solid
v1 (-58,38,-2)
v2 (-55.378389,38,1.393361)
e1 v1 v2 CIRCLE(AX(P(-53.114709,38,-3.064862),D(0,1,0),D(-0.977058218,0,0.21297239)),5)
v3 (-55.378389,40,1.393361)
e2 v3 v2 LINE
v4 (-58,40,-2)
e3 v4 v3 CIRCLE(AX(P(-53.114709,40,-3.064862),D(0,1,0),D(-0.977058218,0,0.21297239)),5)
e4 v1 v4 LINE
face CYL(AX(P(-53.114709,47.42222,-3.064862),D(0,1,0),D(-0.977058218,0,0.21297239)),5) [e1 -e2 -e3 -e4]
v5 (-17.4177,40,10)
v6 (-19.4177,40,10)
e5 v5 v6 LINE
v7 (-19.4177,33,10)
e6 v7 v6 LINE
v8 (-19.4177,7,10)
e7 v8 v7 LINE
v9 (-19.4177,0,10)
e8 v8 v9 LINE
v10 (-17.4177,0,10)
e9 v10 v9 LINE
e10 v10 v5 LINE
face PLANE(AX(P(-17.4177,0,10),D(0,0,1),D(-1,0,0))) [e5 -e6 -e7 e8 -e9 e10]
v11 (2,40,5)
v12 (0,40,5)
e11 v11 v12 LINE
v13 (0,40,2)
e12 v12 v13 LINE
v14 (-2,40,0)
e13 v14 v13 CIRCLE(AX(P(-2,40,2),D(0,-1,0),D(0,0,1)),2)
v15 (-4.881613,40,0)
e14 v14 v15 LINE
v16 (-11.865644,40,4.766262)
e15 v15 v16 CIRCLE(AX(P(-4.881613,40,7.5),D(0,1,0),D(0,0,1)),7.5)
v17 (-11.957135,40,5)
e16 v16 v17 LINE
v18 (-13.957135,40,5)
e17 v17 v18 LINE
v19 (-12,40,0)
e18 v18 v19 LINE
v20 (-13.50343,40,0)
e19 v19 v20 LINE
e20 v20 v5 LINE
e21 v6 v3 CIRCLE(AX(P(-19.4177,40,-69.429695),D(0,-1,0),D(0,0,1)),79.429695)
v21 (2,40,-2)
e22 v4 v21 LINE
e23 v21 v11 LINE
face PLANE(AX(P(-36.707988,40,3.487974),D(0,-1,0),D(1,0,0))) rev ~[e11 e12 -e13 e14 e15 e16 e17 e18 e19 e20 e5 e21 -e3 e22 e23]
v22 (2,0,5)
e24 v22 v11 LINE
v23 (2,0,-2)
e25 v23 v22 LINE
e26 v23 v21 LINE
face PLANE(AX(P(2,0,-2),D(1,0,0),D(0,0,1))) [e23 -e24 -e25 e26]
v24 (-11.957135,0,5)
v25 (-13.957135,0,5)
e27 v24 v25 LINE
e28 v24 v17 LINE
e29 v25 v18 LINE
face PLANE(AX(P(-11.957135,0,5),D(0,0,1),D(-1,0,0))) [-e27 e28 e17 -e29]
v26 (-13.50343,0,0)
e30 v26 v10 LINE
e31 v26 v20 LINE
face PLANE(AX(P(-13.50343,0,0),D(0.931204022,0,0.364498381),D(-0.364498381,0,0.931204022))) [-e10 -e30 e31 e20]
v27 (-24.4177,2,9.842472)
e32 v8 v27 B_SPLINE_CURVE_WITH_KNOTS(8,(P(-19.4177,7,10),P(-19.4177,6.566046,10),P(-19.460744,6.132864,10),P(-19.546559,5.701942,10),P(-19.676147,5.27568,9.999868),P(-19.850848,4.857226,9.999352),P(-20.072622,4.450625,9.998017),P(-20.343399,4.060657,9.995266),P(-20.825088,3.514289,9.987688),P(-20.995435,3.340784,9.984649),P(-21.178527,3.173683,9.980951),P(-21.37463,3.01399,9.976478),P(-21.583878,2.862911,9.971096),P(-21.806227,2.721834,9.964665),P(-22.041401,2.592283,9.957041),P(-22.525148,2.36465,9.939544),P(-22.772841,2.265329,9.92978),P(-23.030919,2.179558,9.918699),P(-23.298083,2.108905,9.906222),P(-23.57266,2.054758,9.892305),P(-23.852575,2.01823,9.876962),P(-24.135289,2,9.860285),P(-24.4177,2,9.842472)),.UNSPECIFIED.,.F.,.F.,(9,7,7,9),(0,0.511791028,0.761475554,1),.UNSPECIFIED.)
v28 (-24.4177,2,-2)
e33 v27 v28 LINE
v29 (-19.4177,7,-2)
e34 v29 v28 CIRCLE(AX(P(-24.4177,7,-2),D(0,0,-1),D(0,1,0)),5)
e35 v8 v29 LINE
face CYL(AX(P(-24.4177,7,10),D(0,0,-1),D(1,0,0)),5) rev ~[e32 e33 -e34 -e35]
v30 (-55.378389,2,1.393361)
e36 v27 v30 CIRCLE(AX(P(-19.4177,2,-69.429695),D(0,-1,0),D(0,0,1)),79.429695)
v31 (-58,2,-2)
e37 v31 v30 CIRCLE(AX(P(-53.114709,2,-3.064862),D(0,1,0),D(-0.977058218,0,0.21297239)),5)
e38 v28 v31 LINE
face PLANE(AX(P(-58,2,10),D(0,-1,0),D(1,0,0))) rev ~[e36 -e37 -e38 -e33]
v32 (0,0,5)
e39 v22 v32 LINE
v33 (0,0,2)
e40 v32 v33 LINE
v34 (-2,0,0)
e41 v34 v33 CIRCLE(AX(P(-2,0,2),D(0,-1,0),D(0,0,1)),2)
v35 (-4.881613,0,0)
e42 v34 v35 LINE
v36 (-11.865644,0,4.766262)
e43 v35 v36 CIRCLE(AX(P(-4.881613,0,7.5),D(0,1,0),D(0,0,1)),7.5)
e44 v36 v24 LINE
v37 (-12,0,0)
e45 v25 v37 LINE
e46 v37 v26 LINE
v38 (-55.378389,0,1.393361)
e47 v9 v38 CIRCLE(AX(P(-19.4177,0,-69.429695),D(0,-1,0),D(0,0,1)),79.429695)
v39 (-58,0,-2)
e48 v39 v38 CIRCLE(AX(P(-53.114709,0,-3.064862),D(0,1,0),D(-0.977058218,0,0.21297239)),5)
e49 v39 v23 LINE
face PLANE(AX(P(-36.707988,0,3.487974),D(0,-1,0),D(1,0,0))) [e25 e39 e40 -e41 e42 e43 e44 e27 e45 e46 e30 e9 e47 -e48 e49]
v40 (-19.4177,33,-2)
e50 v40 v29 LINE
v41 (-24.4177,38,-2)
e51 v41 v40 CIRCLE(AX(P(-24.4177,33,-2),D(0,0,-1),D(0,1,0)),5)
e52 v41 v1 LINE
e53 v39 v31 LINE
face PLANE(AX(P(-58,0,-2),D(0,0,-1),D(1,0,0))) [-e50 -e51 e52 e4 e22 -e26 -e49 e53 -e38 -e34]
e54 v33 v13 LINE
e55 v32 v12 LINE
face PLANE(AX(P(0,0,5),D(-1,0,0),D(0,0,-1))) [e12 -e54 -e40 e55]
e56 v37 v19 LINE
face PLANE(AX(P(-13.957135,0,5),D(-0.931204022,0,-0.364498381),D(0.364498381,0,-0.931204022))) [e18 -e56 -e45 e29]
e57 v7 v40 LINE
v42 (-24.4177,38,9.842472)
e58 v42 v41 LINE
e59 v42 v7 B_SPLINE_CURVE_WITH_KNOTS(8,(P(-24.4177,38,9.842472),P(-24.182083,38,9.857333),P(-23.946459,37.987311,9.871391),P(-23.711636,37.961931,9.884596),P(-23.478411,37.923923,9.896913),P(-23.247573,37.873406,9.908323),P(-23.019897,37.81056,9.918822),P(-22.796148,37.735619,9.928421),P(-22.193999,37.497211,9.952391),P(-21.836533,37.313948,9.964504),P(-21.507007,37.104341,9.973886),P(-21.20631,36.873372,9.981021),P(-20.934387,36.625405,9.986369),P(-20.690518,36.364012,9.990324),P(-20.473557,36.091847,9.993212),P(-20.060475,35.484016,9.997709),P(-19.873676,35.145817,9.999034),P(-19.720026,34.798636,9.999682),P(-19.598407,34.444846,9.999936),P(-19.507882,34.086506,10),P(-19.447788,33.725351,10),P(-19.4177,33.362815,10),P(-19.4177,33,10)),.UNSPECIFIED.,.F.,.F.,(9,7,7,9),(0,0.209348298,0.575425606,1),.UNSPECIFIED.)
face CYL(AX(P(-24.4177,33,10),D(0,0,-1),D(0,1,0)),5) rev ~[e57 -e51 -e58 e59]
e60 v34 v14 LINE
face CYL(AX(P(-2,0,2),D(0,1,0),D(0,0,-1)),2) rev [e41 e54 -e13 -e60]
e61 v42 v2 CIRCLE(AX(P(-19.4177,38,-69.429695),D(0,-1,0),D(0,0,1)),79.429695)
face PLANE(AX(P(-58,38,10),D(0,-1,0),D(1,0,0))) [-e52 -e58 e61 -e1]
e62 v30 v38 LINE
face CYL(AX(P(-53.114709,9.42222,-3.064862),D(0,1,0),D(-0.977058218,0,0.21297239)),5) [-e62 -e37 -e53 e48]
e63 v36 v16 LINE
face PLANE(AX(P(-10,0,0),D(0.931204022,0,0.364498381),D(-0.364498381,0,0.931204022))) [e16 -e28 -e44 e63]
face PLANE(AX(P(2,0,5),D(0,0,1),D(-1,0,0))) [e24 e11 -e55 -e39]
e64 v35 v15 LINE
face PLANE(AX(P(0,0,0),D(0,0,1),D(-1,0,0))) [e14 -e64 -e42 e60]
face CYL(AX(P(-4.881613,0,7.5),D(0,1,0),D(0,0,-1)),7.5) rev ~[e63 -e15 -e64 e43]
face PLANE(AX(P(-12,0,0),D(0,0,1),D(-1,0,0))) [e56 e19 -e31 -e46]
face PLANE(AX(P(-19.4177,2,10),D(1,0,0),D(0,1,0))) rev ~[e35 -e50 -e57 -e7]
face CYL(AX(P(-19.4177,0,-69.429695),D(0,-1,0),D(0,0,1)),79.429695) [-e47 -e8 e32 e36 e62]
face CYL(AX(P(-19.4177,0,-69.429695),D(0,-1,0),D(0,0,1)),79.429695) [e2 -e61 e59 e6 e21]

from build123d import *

# Parameters (mm, degrees)
F1_DEPTH    = 40
F2_R        = 7.5
F3_R        = 2
F4_W        = 38.5823002379
F4_H        = 36
F5_DEPTH    = 25.4
F6_R        = 5
F7_T1_DEPTH = 16.8444406885
F7_T3_DEPTH = 16.8444406885


# Not quite as in the source:
# - a fillet or chamfer that OpenCascade refuses, or shapes differently, is made with other operations: its cross-section is extruded or revolved along the edge and cut away or added


with BuildPart() as f1:
    # F0 (on Front) → F1 (new body)
    with BuildSketch(Plane.XZ):
        with BuildLine():
            ThreePointArc((-19.4176997621, 10), (-39.3462840799, 7.4593677642), (-58, 0))
            Line((-58, 0), (-19.4176997621, 0))
            Line((-19.4176997621, 0), (-19.4176997621, 10))
        make_face()
        Polygon((0, 5), (0, 0), (-10, 0), (-11.9571349147, 5), (-13.9571349147, 5), (-12, 0), (-13.5034299327, 0), (-17.4176997621, 10), (-19.4176997621, 10), (-19.4176997621, 0), (-58, 0), (-58, -2), (2, -2), (2, 5), align=None)
    extrude(amount=-F1_DEPTH)

    # F2
    f2_edges = [f1.edges().sort_by_distance(p)[0] for p in [
        (-10, 20, 0),
    ]]
    fillet(f2_edges, radius=F2_R)

    # F3
    f3_edges = [f1.edges().sort_by_distance(p)[0] for p in [
        (0, 20, 0),
    ]]
    fillet(f3_edges, radius=F3_R)

    # F4 (on face) → F5 (cut)
    with BuildSketch(Plane.XY.offset(10)):
        with Locations((-38.7088498811, 20)):
            Rectangle(F4_W, F4_H)
    extrude(amount=-F5_DEPTH, mode=Mode.SUBTRACT)

    # F6
    f6_edges = [f1.edges().sort_by_distance(p)[0] for p in [
        (-19.4177, 2, 4),
        (-19.4177, 38, 4),
    ]]
    fillet(f6_edges, radius=F6_R)

    # F7: fillet of radius 5 on 2 edges, made by hand

    # F7_s2 → F7_t1 (cut)
    with BuildSketch(Plane.XZ.offset(-9.4222203443)):
        with BuildLine():
            ThreePointArc((-58, -2), (-57.0714339554, -0.0080127697), (-55.3783893775, 1.3933608716))
            ThreePointArc((-55.3783893775, 1.3933608716), (-56.6957053109, 0.7089301814), (-58, 0))
            Line((-58, 0), (-58, -2))
        make_face()
    extrude(amount=F7_T1_DEPTH, mode=Mode.SUBTRACT)

    # F7_s4 → F7_t3 (cut)
    with BuildSketch(Plane.XZ.offset(-47.4222203443)):
        with BuildLine():
            ThreePointArc((-58, -2), (-57.0714339554, -0.0080127697), (-55.3783893775, 1.3933608716))
            ThreePointArc((-55.3783893775, 1.3933608716), (-56.6957053109, 0.7089301814), (-58, 0))
            Line((-58, 0), (-58, -2))
        make_face()
    extrude(amount=F7_T3_DEPTH, mode=Mode.SUBTRACT)


solid = f1.part
